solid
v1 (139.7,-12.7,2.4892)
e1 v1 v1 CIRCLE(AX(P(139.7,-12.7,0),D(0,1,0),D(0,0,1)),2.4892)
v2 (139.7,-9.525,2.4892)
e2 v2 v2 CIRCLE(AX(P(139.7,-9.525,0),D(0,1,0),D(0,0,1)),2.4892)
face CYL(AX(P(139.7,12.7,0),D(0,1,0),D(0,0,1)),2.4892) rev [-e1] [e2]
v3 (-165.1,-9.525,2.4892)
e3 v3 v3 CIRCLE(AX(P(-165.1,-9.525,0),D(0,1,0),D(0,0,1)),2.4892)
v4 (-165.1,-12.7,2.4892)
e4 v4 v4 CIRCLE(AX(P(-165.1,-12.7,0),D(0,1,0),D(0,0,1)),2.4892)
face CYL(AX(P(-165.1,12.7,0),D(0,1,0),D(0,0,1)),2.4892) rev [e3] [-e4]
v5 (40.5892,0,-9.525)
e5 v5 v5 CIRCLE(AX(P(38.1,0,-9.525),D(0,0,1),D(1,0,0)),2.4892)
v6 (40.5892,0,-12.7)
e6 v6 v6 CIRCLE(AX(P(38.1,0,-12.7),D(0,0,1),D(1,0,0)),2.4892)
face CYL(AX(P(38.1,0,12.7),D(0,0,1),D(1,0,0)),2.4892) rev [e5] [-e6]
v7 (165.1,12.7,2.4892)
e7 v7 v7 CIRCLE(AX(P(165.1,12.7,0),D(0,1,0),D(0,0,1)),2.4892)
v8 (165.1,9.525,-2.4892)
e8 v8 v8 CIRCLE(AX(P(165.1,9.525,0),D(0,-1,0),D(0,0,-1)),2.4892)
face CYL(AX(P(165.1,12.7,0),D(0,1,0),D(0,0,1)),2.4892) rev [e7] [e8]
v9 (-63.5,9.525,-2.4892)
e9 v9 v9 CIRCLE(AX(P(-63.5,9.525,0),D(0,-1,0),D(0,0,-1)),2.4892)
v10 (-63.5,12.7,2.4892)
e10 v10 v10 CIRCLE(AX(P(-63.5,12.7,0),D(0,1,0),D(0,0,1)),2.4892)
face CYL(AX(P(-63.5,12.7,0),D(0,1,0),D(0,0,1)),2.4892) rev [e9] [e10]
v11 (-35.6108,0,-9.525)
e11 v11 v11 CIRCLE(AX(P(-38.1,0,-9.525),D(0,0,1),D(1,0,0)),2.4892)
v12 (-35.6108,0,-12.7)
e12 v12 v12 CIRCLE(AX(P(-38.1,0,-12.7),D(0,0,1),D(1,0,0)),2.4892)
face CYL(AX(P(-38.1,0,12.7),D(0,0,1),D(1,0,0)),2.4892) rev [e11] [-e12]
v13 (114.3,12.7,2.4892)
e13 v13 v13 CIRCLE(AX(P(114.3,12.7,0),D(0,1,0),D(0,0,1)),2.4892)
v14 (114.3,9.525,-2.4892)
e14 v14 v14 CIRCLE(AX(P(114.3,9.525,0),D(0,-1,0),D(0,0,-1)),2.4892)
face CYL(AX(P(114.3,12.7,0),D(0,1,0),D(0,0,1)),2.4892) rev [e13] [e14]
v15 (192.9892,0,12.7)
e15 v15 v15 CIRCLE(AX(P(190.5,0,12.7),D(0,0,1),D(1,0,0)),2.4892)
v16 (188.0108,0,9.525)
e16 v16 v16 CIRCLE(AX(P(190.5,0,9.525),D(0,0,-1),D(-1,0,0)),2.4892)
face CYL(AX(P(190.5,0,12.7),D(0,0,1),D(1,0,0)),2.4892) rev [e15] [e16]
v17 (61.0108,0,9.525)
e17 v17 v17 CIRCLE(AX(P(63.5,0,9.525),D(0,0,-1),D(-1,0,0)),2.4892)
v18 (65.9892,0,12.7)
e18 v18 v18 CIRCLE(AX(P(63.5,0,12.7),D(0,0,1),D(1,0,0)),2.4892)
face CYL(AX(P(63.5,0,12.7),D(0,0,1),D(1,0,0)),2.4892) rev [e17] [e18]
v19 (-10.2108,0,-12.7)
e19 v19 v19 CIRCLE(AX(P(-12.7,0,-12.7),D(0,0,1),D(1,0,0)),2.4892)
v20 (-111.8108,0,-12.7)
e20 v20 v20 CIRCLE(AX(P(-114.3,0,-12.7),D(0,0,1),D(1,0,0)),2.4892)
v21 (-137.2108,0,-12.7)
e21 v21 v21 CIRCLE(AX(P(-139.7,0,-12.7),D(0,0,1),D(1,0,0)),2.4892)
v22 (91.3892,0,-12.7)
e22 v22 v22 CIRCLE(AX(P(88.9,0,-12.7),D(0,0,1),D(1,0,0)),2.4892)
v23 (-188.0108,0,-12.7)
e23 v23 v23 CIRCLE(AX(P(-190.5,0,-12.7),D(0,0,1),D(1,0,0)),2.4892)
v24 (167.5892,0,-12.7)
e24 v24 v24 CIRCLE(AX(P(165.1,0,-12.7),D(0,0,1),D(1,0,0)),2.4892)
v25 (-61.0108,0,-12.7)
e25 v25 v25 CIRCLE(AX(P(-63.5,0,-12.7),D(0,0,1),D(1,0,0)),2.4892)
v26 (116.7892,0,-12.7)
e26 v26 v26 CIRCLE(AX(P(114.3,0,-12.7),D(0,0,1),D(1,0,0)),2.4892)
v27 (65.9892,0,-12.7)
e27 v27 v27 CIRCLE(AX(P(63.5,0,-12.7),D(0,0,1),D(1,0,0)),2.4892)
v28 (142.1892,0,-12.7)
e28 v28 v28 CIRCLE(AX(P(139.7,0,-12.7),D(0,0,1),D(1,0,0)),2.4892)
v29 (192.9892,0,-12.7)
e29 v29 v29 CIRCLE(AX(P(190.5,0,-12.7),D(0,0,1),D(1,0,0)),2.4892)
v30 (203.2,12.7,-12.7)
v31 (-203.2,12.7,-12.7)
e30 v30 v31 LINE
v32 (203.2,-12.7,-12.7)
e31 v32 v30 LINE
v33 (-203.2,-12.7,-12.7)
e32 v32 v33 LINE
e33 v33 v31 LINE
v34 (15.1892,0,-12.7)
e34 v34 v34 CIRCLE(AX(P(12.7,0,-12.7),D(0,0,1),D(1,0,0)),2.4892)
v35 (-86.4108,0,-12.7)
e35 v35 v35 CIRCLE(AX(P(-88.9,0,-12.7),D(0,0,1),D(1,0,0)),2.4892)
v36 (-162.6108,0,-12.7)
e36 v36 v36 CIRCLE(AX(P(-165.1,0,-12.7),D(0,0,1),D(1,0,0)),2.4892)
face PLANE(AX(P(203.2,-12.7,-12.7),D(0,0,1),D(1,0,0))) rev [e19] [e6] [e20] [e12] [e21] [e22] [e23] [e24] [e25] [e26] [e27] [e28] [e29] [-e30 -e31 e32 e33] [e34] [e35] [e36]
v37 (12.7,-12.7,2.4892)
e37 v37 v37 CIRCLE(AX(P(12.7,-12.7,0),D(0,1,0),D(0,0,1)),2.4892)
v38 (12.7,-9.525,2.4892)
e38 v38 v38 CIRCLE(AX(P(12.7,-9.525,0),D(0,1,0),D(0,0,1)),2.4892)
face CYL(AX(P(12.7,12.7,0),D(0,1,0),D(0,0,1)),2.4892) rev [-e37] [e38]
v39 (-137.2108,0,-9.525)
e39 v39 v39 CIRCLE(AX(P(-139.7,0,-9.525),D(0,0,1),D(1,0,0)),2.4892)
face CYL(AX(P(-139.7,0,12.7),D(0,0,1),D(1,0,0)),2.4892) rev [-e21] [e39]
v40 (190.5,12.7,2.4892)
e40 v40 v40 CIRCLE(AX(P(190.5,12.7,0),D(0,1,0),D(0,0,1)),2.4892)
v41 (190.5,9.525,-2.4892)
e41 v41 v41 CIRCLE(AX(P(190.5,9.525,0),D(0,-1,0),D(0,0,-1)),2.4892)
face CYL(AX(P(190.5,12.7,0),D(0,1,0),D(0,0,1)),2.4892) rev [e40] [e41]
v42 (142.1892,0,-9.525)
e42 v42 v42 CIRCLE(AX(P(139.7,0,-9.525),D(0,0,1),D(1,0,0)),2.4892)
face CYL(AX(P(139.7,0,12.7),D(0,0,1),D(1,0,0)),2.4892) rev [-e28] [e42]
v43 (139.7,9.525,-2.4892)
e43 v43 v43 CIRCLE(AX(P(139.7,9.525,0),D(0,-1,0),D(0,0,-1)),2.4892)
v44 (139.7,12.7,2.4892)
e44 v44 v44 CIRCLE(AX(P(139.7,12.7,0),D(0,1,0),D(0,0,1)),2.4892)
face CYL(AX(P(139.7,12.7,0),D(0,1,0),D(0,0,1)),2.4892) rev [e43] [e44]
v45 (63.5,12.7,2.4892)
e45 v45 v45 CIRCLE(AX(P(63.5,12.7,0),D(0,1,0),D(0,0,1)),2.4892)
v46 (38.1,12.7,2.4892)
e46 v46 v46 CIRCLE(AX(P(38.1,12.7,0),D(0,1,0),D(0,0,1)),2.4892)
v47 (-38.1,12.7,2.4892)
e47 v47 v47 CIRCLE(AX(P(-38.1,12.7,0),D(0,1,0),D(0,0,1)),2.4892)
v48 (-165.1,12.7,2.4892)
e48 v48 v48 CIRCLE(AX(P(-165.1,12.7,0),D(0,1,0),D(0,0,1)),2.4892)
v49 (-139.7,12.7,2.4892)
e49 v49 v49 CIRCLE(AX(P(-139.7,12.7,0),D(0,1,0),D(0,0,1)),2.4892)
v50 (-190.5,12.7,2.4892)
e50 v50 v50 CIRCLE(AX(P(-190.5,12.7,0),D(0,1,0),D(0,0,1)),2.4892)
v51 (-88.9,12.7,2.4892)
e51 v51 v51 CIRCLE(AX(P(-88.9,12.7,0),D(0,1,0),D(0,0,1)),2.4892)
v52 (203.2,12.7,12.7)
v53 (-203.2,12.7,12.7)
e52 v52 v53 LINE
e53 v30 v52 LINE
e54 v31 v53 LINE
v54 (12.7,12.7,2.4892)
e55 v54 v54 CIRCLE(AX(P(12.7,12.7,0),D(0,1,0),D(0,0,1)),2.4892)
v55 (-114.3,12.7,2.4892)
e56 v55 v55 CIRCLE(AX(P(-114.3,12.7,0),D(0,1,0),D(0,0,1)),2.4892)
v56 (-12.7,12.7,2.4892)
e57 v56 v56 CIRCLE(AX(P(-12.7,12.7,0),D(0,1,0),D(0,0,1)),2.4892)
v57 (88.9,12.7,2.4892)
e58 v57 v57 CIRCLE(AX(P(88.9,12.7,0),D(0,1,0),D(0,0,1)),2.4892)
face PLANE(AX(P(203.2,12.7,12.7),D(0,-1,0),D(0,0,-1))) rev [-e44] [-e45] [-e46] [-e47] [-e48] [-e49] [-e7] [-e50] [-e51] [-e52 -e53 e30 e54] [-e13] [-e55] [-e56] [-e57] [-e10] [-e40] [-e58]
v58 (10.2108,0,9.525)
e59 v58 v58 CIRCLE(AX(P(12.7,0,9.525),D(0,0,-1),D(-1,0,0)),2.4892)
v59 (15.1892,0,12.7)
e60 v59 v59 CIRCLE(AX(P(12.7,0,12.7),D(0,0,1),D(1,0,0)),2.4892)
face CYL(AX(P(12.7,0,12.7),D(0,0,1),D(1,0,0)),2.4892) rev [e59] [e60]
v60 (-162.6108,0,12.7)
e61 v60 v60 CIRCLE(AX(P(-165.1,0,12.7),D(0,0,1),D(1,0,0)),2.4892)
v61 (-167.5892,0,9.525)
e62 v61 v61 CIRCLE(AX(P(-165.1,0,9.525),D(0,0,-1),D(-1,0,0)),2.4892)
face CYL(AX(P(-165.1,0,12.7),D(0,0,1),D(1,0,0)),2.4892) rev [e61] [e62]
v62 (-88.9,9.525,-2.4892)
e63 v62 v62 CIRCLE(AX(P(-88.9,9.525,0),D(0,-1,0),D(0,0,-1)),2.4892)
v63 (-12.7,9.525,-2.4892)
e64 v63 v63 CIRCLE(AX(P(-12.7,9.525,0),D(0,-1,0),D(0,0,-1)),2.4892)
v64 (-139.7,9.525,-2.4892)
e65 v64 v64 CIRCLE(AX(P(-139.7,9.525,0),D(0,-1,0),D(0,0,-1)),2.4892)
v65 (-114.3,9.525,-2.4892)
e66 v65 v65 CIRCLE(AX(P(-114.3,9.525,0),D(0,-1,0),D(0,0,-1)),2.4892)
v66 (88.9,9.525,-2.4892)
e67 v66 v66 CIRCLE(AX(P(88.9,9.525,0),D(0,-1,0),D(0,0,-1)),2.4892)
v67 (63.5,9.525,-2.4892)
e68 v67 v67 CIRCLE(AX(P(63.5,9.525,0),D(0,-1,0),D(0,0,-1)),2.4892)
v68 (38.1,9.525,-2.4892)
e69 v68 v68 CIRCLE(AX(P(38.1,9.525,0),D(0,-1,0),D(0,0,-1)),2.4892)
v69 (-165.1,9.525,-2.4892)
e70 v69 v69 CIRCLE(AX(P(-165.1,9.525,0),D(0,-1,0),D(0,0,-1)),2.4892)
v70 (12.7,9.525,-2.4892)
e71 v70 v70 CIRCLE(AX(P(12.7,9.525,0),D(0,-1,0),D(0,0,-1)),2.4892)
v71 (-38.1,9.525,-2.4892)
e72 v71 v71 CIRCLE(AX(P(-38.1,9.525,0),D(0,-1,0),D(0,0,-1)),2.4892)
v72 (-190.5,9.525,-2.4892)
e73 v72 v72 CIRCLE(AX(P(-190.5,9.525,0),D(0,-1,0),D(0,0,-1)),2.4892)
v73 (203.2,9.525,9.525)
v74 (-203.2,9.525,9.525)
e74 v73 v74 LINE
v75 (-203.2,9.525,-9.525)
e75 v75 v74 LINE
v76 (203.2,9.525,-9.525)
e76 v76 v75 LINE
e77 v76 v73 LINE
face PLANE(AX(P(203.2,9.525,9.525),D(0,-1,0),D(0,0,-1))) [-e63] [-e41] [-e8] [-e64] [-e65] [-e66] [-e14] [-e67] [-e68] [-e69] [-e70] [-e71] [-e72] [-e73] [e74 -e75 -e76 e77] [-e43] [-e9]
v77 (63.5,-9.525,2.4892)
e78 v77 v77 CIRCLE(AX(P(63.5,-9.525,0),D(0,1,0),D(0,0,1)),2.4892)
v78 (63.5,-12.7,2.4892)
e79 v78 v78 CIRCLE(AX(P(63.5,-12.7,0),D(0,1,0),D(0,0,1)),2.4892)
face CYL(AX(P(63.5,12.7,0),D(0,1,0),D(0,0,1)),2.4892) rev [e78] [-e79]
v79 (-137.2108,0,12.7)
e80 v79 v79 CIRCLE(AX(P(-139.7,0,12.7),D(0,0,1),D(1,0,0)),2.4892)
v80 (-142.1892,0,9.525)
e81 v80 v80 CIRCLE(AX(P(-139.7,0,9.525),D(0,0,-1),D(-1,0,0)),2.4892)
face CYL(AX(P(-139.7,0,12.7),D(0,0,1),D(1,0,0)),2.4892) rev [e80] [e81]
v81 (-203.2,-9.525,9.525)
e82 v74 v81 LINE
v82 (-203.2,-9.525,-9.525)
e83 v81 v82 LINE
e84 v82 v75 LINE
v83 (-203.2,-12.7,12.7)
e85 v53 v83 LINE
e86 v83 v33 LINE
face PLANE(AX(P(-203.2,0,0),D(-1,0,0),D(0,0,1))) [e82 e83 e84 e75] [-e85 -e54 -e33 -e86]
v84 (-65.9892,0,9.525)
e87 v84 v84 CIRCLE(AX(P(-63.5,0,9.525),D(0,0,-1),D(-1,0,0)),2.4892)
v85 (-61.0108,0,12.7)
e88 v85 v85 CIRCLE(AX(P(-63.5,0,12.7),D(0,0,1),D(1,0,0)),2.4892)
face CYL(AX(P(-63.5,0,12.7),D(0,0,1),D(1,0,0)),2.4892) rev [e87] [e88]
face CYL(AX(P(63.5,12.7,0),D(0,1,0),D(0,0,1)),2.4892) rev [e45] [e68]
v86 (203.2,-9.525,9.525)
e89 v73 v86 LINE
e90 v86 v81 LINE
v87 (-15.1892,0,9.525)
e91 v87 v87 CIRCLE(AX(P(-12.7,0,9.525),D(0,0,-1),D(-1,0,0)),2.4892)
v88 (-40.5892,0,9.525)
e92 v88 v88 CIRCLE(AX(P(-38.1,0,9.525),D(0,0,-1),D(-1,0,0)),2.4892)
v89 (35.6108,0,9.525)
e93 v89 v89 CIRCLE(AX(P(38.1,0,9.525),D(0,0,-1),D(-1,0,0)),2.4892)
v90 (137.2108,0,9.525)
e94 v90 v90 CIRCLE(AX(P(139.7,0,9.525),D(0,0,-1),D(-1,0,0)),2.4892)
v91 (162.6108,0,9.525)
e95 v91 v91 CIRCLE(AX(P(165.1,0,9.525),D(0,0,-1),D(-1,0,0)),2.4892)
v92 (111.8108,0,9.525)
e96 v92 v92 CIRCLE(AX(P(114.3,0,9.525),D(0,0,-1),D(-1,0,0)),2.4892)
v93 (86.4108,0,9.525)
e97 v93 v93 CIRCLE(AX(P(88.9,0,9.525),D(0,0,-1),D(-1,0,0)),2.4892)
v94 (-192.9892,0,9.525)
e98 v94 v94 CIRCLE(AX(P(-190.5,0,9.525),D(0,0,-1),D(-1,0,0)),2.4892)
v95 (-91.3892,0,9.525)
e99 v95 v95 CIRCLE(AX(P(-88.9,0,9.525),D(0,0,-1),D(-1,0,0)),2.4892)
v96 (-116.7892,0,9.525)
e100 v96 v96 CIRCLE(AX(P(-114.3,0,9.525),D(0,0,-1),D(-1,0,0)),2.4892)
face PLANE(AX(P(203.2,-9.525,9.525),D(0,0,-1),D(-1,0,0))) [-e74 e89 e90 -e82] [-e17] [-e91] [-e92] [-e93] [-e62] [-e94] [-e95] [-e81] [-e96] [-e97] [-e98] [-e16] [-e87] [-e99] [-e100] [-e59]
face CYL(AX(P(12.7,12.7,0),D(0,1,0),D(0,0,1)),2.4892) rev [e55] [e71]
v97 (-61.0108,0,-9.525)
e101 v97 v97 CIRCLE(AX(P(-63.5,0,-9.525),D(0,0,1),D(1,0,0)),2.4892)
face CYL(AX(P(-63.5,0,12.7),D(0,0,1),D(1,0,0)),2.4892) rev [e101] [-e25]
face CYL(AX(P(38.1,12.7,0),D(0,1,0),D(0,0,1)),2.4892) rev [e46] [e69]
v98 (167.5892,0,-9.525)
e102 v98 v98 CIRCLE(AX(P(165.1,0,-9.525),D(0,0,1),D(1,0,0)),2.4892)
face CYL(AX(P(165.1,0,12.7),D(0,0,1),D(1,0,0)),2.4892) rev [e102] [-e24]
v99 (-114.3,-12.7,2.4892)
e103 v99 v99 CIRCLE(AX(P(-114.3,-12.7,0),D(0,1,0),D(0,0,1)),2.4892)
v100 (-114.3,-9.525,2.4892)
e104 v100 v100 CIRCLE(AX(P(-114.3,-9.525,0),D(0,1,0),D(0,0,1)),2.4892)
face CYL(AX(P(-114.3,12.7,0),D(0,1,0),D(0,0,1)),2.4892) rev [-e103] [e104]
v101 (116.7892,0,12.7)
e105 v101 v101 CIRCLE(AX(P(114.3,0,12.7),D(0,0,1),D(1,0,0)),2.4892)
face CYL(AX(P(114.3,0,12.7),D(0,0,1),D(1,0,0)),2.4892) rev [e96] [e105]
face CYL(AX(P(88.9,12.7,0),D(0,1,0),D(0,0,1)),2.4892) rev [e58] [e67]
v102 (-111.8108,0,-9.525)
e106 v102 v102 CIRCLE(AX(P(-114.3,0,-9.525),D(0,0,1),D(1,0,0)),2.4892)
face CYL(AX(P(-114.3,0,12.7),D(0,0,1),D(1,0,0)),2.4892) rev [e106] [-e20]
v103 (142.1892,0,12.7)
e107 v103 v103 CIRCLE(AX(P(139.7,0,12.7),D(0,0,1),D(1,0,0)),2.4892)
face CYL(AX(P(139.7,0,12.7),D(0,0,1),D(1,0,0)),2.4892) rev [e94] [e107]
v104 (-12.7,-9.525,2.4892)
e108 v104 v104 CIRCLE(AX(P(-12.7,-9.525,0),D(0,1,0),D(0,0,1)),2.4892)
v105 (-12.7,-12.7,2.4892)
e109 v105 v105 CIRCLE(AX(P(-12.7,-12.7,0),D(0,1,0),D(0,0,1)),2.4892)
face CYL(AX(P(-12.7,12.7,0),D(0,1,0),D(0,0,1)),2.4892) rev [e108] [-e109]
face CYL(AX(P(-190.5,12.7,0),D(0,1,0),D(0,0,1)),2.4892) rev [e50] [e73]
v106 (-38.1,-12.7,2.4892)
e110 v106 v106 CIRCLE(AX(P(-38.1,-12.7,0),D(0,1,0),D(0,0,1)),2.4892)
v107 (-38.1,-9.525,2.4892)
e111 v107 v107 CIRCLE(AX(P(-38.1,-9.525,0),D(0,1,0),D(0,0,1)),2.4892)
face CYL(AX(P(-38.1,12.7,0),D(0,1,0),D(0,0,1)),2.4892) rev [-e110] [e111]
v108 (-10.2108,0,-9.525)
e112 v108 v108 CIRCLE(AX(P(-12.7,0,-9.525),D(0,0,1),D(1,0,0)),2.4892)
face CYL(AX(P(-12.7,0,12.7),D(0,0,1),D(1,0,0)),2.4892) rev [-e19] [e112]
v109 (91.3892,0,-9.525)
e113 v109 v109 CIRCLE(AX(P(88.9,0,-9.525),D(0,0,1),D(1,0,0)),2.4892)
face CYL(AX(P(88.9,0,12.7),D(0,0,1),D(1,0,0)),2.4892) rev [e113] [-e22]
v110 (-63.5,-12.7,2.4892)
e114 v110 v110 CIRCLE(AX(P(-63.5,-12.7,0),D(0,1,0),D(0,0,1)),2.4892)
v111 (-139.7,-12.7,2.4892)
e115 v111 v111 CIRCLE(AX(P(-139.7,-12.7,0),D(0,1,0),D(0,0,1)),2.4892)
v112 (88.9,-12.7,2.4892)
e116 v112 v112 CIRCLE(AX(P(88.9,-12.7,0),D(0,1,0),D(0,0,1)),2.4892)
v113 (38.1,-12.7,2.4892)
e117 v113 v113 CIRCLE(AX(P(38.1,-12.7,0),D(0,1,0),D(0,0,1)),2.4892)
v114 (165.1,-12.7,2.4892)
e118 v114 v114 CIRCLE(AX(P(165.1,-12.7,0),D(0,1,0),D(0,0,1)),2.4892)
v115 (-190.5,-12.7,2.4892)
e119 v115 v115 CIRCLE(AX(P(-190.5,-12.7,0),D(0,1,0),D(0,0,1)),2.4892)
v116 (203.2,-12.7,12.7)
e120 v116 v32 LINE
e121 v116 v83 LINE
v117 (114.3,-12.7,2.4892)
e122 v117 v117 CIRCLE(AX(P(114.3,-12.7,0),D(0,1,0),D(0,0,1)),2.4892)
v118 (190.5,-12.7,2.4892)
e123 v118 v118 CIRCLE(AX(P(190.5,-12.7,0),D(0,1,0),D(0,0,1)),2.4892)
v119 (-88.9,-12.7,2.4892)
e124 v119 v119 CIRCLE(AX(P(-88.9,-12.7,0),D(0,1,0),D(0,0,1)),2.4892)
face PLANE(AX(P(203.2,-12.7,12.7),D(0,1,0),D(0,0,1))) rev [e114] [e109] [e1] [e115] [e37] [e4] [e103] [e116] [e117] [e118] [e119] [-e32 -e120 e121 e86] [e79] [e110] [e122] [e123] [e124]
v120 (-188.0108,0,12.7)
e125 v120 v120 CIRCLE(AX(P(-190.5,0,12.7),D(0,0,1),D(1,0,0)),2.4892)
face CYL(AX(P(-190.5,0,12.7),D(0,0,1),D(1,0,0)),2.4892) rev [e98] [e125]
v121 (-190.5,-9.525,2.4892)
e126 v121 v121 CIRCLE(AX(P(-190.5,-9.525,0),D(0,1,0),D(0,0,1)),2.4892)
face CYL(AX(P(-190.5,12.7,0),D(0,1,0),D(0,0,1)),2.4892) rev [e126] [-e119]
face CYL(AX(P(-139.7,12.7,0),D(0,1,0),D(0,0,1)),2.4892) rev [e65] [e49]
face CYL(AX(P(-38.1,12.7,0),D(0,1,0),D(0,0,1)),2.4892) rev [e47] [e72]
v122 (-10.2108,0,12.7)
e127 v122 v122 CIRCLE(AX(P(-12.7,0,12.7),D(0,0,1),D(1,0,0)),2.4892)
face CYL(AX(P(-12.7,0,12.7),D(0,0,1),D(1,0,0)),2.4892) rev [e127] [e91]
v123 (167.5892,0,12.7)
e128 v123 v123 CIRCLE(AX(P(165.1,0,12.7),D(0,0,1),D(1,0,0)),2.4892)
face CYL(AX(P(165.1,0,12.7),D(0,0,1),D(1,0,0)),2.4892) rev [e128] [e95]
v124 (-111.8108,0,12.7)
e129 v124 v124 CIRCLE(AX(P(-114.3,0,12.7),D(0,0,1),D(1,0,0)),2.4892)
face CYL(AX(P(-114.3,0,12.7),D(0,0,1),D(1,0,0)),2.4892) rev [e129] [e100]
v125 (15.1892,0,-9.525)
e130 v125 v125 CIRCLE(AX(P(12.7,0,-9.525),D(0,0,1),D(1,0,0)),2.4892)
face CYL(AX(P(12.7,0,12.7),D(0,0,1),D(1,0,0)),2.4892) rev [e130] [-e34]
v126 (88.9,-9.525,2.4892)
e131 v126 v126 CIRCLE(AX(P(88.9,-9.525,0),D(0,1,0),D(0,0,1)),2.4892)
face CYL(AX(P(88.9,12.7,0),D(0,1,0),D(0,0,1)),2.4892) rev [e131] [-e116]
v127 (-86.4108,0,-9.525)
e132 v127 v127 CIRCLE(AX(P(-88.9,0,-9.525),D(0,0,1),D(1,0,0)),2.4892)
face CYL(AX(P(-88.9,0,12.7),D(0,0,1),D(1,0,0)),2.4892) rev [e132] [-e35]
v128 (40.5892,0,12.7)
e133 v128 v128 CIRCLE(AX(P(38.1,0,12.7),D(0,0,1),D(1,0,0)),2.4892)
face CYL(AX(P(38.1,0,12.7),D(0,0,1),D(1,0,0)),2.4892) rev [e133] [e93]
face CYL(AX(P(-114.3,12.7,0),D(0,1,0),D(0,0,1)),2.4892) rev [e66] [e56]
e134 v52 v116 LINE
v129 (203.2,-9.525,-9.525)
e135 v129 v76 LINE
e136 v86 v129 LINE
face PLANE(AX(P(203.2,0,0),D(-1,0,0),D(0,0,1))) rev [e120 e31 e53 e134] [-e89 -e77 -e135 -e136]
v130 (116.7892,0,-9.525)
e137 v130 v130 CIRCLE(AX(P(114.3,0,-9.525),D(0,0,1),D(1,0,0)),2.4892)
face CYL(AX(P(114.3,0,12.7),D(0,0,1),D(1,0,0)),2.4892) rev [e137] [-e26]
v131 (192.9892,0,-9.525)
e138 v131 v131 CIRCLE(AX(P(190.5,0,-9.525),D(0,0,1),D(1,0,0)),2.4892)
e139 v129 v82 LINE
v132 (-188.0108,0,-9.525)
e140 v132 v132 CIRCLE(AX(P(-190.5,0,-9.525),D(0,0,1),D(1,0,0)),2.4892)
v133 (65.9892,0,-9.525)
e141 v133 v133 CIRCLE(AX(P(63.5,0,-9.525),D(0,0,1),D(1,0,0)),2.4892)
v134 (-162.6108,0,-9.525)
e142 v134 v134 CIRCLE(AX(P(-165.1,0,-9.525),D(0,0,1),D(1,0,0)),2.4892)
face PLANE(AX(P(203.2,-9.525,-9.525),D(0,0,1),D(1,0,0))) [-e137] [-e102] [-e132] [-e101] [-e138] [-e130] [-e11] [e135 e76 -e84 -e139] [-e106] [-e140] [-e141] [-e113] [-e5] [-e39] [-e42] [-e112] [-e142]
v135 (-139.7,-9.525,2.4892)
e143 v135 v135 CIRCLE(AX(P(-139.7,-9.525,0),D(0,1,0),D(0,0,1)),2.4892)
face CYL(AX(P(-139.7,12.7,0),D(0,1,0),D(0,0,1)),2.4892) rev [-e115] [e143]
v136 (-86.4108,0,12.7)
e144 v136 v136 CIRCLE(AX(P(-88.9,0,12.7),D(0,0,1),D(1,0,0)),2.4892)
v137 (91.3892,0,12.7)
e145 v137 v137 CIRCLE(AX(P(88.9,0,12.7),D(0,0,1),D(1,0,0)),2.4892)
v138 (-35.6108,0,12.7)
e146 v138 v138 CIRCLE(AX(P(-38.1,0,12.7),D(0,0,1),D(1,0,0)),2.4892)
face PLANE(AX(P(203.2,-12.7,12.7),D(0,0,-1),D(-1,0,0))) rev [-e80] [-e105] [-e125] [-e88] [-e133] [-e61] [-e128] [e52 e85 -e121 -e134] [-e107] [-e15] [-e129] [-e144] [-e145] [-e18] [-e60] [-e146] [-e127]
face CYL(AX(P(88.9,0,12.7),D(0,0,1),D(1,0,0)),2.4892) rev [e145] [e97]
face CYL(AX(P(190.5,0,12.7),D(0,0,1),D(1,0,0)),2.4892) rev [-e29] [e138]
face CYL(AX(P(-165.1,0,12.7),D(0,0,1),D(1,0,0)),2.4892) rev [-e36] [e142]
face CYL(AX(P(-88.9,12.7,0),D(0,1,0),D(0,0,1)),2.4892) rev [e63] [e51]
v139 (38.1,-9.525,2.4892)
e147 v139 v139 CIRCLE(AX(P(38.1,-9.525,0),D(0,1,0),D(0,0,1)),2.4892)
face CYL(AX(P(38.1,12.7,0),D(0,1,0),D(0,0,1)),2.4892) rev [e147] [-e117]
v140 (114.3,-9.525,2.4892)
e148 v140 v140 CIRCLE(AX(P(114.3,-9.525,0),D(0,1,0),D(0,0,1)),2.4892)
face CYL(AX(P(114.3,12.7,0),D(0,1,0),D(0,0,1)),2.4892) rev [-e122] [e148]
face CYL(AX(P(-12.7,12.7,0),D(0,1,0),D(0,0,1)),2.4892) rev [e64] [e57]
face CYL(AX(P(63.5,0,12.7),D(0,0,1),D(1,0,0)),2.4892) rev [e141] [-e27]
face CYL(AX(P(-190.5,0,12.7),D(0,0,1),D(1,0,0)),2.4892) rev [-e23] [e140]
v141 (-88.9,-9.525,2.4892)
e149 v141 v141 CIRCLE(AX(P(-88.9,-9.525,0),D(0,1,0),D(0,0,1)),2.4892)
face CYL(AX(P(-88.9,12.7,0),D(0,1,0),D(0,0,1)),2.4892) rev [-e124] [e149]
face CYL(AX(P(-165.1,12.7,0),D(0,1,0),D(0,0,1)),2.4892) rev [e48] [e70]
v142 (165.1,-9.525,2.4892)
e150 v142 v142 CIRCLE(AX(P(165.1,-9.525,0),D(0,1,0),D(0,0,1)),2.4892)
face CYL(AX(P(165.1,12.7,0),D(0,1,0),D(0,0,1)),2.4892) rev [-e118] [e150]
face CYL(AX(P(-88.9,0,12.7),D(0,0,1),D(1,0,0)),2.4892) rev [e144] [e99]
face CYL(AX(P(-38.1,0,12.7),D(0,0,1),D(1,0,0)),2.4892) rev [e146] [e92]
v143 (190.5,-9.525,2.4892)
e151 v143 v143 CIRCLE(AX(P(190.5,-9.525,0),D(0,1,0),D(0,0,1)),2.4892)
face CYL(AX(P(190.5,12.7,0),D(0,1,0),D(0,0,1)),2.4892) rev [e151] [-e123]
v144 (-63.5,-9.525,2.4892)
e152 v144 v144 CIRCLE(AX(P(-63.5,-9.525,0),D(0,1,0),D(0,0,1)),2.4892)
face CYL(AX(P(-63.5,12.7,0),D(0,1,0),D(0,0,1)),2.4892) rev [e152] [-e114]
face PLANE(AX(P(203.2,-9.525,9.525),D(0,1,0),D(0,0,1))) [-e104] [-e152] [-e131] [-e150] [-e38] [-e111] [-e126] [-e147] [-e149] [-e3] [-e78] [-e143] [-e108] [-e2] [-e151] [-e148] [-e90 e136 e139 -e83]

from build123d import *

# Parameters (mm, degrees)
SKETCH1_W             = 25.4
SKETCH1_H             = 25.4
SKETCH1_W_2           = 19.05
SKETCH1_H_2           = 19.05
BOSS_EXTRUDE1_DEPTH   = 203.2
SKETCH3_W             = 2.4892
SKETCH3_H             = 25.4
SKETCH3_AT_POINT_2_W  = 2.4892
SKETCH3_AT_POINT_2_H  = 25.4
LPATTERN1_START       = -12.7
LPATTERN1_OUTLINE_R   = 2.4892
LPATTERN1_DEPTH       = 25.4
LPATTERN1_2_OUTLINE_R = 2.4892
LPATTERN1_2_DEPTH     = 25.4


# Read off the part's stored shape, not the designer's step: LPattern1
with BuildPart() as part:
    # Sketch1 → Boss-Extrude1 (new, symmetric)
    with BuildSketch(Plane(origin=(0, 0, 0), x_dir=(0, 0, -1), z_dir=(1, 0, 0))):
        Rectangle(SKETCH1_W, SKETCH1_H)
        Rectangle(SKETCH1_W_2, SKETCH1_H_2, mode=Mode.SUBTRACT)
    extrude(amount=BOSS_EXTRUDE1_DEPTH, both=True)

    # Sketch3 → #9 (0.196) Diameter Hole1 (revolve, cut)
    with BuildSketch(Plane(origin=(190.5, 12.7, 0), x_dir=(0, 0, 1), z_dir=(1, 0, 0))):
        with Locations((1.2446, 12.7)):
            Rectangle(SKETCH3_W, SKETCH3_H)
    revolve(axis=Axis((190.5, 19.05, 0), (0, -1, 0)), mode=Mode.SUBTRACT)

    # Sketch3 at point 2 (carried to point 2, square into its face) → #9 (0.196) Diameter Hole1 at 2 (revolve, cut)
    with BuildSketch(Plane(origin=(190.5, 0, 12.7), x_dir=(0, -1, 0), z_dir=(1, 0, 0))):
        with Locations((1.2446, 12.7)):
            Rectangle(SKETCH3_AT_POINT_2_W, SKETCH3_AT_POINT_2_H)
    revolve(axis=Axis((190.5, 0, 19.05), (0, 0, -1)), mode=Mode.SUBTRACT)

    # LPattern1 outline → LPattern1 (cut)
    with BuildSketch(Plane.XY.offset(LPATTERN1_START)):
        with Locations((165.1, 0)):
            Circle(LPATTERN1_OUTLINE_R)
        with Locations((139.7, 0)):
            Circle(LPATTERN1_OUTLINE_R)
        with Locations((114.3, 0)):
            Circle(LPATTERN1_OUTLINE_R)
        with Locations((88.9, 0)):
            Circle(LPATTERN1_OUTLINE_R)
        with Locations((63.5, 0)):
            Circle(LPATTERN1_OUTLINE_R)
        with Locations((38.1, 0)):
            Circle(LPATTERN1_OUTLINE_R)
        with Locations((12.7, 0)):
            Circle(LPATTERN1_OUTLINE_R)
        with Locations((-12.7, 0)):
            Circle(LPATTERN1_OUTLINE_R)
        with Locations((-38.1, 0)):
            Circle(LPATTERN1_OUTLINE_R)
        with Locations((-63.5, 0)):
            Circle(LPATTERN1_OUTLINE_R)
        with Locations((-88.9, 0)):
            Circle(LPATTERN1_OUTLINE_R)
        with Locations((-114.3, 0)):
            Circle(LPATTERN1_OUTLINE_R)
        with Locations((-139.7, 0)):
            Circle(LPATTERN1_OUTLINE_R)
        with Locations((-165.1, 0)):
            Circle(LPATTERN1_OUTLINE_R)
        with Locations((-190.5, 0)):
            Circle(LPATTERN1_OUTLINE_R)
    extrude(amount=LPATTERN1_DEPTH, mode=Mode.SUBTRACT)

    # LPattern1 2 outline → LPattern1 2 (cut)
    with BuildSketch(Plane(origin=(0, 0, 0), x_dir=(1, 0, 0), z_dir=(0, 1, 0)).offset(LPATTERN1_START)):
        with Locations((165.1, 0)):
            Circle(LPATTERN1_2_OUTLINE_R)
        with Locations((139.7, 0)):
            Circle(LPATTERN1_2_OUTLINE_R)
        with Locations((114.3, 0)):
            Circle(LPATTERN1_2_OUTLINE_R)
        with Locations((88.9, 0)):
            Circle(LPATTERN1_2_OUTLINE_R)
        with Locations((63.5, 0)):
            Circle(LPATTERN1_2_OUTLINE_R)
        with Locations((38.1, 0)):
            Circle(LPATTERN1_2_OUTLINE_R)
        with Locations((12.7, 0)):
            Circle(LPATTERN1_2_OUTLINE_R)
        with Locations((-12.7, 0)):
            Circle(LPATTERN1_2_OUTLINE_R)
        with Locations((-38.1, 0)):
            Circle(LPATTERN1_2_OUTLINE_R)
        with Locations((-63.5, 0)):
            Circle(LPATTERN1_2_OUTLINE_R)
        with Locations((-88.9, 0)):
            Circle(LPATTERN1_2_OUTLINE_R)
        with Locations((-114.3, 0)):
            Circle(LPATTERN1_2_OUTLINE_R)
        with Locations((-139.7, 0)):
            Circle(LPATTERN1_2_OUTLINE_R)
        with Locations((-165.1, 0)):
            Circle(LPATTERN1_2_OUTLINE_R)
        with Locations((-190.5, 0)):
            Circle(LPATTERN1_2_OUTLINE_R)
    extrude(amount=LPATTERN1_2_DEPTH, mode=Mode.SUBTRACT)


solid = part.part
